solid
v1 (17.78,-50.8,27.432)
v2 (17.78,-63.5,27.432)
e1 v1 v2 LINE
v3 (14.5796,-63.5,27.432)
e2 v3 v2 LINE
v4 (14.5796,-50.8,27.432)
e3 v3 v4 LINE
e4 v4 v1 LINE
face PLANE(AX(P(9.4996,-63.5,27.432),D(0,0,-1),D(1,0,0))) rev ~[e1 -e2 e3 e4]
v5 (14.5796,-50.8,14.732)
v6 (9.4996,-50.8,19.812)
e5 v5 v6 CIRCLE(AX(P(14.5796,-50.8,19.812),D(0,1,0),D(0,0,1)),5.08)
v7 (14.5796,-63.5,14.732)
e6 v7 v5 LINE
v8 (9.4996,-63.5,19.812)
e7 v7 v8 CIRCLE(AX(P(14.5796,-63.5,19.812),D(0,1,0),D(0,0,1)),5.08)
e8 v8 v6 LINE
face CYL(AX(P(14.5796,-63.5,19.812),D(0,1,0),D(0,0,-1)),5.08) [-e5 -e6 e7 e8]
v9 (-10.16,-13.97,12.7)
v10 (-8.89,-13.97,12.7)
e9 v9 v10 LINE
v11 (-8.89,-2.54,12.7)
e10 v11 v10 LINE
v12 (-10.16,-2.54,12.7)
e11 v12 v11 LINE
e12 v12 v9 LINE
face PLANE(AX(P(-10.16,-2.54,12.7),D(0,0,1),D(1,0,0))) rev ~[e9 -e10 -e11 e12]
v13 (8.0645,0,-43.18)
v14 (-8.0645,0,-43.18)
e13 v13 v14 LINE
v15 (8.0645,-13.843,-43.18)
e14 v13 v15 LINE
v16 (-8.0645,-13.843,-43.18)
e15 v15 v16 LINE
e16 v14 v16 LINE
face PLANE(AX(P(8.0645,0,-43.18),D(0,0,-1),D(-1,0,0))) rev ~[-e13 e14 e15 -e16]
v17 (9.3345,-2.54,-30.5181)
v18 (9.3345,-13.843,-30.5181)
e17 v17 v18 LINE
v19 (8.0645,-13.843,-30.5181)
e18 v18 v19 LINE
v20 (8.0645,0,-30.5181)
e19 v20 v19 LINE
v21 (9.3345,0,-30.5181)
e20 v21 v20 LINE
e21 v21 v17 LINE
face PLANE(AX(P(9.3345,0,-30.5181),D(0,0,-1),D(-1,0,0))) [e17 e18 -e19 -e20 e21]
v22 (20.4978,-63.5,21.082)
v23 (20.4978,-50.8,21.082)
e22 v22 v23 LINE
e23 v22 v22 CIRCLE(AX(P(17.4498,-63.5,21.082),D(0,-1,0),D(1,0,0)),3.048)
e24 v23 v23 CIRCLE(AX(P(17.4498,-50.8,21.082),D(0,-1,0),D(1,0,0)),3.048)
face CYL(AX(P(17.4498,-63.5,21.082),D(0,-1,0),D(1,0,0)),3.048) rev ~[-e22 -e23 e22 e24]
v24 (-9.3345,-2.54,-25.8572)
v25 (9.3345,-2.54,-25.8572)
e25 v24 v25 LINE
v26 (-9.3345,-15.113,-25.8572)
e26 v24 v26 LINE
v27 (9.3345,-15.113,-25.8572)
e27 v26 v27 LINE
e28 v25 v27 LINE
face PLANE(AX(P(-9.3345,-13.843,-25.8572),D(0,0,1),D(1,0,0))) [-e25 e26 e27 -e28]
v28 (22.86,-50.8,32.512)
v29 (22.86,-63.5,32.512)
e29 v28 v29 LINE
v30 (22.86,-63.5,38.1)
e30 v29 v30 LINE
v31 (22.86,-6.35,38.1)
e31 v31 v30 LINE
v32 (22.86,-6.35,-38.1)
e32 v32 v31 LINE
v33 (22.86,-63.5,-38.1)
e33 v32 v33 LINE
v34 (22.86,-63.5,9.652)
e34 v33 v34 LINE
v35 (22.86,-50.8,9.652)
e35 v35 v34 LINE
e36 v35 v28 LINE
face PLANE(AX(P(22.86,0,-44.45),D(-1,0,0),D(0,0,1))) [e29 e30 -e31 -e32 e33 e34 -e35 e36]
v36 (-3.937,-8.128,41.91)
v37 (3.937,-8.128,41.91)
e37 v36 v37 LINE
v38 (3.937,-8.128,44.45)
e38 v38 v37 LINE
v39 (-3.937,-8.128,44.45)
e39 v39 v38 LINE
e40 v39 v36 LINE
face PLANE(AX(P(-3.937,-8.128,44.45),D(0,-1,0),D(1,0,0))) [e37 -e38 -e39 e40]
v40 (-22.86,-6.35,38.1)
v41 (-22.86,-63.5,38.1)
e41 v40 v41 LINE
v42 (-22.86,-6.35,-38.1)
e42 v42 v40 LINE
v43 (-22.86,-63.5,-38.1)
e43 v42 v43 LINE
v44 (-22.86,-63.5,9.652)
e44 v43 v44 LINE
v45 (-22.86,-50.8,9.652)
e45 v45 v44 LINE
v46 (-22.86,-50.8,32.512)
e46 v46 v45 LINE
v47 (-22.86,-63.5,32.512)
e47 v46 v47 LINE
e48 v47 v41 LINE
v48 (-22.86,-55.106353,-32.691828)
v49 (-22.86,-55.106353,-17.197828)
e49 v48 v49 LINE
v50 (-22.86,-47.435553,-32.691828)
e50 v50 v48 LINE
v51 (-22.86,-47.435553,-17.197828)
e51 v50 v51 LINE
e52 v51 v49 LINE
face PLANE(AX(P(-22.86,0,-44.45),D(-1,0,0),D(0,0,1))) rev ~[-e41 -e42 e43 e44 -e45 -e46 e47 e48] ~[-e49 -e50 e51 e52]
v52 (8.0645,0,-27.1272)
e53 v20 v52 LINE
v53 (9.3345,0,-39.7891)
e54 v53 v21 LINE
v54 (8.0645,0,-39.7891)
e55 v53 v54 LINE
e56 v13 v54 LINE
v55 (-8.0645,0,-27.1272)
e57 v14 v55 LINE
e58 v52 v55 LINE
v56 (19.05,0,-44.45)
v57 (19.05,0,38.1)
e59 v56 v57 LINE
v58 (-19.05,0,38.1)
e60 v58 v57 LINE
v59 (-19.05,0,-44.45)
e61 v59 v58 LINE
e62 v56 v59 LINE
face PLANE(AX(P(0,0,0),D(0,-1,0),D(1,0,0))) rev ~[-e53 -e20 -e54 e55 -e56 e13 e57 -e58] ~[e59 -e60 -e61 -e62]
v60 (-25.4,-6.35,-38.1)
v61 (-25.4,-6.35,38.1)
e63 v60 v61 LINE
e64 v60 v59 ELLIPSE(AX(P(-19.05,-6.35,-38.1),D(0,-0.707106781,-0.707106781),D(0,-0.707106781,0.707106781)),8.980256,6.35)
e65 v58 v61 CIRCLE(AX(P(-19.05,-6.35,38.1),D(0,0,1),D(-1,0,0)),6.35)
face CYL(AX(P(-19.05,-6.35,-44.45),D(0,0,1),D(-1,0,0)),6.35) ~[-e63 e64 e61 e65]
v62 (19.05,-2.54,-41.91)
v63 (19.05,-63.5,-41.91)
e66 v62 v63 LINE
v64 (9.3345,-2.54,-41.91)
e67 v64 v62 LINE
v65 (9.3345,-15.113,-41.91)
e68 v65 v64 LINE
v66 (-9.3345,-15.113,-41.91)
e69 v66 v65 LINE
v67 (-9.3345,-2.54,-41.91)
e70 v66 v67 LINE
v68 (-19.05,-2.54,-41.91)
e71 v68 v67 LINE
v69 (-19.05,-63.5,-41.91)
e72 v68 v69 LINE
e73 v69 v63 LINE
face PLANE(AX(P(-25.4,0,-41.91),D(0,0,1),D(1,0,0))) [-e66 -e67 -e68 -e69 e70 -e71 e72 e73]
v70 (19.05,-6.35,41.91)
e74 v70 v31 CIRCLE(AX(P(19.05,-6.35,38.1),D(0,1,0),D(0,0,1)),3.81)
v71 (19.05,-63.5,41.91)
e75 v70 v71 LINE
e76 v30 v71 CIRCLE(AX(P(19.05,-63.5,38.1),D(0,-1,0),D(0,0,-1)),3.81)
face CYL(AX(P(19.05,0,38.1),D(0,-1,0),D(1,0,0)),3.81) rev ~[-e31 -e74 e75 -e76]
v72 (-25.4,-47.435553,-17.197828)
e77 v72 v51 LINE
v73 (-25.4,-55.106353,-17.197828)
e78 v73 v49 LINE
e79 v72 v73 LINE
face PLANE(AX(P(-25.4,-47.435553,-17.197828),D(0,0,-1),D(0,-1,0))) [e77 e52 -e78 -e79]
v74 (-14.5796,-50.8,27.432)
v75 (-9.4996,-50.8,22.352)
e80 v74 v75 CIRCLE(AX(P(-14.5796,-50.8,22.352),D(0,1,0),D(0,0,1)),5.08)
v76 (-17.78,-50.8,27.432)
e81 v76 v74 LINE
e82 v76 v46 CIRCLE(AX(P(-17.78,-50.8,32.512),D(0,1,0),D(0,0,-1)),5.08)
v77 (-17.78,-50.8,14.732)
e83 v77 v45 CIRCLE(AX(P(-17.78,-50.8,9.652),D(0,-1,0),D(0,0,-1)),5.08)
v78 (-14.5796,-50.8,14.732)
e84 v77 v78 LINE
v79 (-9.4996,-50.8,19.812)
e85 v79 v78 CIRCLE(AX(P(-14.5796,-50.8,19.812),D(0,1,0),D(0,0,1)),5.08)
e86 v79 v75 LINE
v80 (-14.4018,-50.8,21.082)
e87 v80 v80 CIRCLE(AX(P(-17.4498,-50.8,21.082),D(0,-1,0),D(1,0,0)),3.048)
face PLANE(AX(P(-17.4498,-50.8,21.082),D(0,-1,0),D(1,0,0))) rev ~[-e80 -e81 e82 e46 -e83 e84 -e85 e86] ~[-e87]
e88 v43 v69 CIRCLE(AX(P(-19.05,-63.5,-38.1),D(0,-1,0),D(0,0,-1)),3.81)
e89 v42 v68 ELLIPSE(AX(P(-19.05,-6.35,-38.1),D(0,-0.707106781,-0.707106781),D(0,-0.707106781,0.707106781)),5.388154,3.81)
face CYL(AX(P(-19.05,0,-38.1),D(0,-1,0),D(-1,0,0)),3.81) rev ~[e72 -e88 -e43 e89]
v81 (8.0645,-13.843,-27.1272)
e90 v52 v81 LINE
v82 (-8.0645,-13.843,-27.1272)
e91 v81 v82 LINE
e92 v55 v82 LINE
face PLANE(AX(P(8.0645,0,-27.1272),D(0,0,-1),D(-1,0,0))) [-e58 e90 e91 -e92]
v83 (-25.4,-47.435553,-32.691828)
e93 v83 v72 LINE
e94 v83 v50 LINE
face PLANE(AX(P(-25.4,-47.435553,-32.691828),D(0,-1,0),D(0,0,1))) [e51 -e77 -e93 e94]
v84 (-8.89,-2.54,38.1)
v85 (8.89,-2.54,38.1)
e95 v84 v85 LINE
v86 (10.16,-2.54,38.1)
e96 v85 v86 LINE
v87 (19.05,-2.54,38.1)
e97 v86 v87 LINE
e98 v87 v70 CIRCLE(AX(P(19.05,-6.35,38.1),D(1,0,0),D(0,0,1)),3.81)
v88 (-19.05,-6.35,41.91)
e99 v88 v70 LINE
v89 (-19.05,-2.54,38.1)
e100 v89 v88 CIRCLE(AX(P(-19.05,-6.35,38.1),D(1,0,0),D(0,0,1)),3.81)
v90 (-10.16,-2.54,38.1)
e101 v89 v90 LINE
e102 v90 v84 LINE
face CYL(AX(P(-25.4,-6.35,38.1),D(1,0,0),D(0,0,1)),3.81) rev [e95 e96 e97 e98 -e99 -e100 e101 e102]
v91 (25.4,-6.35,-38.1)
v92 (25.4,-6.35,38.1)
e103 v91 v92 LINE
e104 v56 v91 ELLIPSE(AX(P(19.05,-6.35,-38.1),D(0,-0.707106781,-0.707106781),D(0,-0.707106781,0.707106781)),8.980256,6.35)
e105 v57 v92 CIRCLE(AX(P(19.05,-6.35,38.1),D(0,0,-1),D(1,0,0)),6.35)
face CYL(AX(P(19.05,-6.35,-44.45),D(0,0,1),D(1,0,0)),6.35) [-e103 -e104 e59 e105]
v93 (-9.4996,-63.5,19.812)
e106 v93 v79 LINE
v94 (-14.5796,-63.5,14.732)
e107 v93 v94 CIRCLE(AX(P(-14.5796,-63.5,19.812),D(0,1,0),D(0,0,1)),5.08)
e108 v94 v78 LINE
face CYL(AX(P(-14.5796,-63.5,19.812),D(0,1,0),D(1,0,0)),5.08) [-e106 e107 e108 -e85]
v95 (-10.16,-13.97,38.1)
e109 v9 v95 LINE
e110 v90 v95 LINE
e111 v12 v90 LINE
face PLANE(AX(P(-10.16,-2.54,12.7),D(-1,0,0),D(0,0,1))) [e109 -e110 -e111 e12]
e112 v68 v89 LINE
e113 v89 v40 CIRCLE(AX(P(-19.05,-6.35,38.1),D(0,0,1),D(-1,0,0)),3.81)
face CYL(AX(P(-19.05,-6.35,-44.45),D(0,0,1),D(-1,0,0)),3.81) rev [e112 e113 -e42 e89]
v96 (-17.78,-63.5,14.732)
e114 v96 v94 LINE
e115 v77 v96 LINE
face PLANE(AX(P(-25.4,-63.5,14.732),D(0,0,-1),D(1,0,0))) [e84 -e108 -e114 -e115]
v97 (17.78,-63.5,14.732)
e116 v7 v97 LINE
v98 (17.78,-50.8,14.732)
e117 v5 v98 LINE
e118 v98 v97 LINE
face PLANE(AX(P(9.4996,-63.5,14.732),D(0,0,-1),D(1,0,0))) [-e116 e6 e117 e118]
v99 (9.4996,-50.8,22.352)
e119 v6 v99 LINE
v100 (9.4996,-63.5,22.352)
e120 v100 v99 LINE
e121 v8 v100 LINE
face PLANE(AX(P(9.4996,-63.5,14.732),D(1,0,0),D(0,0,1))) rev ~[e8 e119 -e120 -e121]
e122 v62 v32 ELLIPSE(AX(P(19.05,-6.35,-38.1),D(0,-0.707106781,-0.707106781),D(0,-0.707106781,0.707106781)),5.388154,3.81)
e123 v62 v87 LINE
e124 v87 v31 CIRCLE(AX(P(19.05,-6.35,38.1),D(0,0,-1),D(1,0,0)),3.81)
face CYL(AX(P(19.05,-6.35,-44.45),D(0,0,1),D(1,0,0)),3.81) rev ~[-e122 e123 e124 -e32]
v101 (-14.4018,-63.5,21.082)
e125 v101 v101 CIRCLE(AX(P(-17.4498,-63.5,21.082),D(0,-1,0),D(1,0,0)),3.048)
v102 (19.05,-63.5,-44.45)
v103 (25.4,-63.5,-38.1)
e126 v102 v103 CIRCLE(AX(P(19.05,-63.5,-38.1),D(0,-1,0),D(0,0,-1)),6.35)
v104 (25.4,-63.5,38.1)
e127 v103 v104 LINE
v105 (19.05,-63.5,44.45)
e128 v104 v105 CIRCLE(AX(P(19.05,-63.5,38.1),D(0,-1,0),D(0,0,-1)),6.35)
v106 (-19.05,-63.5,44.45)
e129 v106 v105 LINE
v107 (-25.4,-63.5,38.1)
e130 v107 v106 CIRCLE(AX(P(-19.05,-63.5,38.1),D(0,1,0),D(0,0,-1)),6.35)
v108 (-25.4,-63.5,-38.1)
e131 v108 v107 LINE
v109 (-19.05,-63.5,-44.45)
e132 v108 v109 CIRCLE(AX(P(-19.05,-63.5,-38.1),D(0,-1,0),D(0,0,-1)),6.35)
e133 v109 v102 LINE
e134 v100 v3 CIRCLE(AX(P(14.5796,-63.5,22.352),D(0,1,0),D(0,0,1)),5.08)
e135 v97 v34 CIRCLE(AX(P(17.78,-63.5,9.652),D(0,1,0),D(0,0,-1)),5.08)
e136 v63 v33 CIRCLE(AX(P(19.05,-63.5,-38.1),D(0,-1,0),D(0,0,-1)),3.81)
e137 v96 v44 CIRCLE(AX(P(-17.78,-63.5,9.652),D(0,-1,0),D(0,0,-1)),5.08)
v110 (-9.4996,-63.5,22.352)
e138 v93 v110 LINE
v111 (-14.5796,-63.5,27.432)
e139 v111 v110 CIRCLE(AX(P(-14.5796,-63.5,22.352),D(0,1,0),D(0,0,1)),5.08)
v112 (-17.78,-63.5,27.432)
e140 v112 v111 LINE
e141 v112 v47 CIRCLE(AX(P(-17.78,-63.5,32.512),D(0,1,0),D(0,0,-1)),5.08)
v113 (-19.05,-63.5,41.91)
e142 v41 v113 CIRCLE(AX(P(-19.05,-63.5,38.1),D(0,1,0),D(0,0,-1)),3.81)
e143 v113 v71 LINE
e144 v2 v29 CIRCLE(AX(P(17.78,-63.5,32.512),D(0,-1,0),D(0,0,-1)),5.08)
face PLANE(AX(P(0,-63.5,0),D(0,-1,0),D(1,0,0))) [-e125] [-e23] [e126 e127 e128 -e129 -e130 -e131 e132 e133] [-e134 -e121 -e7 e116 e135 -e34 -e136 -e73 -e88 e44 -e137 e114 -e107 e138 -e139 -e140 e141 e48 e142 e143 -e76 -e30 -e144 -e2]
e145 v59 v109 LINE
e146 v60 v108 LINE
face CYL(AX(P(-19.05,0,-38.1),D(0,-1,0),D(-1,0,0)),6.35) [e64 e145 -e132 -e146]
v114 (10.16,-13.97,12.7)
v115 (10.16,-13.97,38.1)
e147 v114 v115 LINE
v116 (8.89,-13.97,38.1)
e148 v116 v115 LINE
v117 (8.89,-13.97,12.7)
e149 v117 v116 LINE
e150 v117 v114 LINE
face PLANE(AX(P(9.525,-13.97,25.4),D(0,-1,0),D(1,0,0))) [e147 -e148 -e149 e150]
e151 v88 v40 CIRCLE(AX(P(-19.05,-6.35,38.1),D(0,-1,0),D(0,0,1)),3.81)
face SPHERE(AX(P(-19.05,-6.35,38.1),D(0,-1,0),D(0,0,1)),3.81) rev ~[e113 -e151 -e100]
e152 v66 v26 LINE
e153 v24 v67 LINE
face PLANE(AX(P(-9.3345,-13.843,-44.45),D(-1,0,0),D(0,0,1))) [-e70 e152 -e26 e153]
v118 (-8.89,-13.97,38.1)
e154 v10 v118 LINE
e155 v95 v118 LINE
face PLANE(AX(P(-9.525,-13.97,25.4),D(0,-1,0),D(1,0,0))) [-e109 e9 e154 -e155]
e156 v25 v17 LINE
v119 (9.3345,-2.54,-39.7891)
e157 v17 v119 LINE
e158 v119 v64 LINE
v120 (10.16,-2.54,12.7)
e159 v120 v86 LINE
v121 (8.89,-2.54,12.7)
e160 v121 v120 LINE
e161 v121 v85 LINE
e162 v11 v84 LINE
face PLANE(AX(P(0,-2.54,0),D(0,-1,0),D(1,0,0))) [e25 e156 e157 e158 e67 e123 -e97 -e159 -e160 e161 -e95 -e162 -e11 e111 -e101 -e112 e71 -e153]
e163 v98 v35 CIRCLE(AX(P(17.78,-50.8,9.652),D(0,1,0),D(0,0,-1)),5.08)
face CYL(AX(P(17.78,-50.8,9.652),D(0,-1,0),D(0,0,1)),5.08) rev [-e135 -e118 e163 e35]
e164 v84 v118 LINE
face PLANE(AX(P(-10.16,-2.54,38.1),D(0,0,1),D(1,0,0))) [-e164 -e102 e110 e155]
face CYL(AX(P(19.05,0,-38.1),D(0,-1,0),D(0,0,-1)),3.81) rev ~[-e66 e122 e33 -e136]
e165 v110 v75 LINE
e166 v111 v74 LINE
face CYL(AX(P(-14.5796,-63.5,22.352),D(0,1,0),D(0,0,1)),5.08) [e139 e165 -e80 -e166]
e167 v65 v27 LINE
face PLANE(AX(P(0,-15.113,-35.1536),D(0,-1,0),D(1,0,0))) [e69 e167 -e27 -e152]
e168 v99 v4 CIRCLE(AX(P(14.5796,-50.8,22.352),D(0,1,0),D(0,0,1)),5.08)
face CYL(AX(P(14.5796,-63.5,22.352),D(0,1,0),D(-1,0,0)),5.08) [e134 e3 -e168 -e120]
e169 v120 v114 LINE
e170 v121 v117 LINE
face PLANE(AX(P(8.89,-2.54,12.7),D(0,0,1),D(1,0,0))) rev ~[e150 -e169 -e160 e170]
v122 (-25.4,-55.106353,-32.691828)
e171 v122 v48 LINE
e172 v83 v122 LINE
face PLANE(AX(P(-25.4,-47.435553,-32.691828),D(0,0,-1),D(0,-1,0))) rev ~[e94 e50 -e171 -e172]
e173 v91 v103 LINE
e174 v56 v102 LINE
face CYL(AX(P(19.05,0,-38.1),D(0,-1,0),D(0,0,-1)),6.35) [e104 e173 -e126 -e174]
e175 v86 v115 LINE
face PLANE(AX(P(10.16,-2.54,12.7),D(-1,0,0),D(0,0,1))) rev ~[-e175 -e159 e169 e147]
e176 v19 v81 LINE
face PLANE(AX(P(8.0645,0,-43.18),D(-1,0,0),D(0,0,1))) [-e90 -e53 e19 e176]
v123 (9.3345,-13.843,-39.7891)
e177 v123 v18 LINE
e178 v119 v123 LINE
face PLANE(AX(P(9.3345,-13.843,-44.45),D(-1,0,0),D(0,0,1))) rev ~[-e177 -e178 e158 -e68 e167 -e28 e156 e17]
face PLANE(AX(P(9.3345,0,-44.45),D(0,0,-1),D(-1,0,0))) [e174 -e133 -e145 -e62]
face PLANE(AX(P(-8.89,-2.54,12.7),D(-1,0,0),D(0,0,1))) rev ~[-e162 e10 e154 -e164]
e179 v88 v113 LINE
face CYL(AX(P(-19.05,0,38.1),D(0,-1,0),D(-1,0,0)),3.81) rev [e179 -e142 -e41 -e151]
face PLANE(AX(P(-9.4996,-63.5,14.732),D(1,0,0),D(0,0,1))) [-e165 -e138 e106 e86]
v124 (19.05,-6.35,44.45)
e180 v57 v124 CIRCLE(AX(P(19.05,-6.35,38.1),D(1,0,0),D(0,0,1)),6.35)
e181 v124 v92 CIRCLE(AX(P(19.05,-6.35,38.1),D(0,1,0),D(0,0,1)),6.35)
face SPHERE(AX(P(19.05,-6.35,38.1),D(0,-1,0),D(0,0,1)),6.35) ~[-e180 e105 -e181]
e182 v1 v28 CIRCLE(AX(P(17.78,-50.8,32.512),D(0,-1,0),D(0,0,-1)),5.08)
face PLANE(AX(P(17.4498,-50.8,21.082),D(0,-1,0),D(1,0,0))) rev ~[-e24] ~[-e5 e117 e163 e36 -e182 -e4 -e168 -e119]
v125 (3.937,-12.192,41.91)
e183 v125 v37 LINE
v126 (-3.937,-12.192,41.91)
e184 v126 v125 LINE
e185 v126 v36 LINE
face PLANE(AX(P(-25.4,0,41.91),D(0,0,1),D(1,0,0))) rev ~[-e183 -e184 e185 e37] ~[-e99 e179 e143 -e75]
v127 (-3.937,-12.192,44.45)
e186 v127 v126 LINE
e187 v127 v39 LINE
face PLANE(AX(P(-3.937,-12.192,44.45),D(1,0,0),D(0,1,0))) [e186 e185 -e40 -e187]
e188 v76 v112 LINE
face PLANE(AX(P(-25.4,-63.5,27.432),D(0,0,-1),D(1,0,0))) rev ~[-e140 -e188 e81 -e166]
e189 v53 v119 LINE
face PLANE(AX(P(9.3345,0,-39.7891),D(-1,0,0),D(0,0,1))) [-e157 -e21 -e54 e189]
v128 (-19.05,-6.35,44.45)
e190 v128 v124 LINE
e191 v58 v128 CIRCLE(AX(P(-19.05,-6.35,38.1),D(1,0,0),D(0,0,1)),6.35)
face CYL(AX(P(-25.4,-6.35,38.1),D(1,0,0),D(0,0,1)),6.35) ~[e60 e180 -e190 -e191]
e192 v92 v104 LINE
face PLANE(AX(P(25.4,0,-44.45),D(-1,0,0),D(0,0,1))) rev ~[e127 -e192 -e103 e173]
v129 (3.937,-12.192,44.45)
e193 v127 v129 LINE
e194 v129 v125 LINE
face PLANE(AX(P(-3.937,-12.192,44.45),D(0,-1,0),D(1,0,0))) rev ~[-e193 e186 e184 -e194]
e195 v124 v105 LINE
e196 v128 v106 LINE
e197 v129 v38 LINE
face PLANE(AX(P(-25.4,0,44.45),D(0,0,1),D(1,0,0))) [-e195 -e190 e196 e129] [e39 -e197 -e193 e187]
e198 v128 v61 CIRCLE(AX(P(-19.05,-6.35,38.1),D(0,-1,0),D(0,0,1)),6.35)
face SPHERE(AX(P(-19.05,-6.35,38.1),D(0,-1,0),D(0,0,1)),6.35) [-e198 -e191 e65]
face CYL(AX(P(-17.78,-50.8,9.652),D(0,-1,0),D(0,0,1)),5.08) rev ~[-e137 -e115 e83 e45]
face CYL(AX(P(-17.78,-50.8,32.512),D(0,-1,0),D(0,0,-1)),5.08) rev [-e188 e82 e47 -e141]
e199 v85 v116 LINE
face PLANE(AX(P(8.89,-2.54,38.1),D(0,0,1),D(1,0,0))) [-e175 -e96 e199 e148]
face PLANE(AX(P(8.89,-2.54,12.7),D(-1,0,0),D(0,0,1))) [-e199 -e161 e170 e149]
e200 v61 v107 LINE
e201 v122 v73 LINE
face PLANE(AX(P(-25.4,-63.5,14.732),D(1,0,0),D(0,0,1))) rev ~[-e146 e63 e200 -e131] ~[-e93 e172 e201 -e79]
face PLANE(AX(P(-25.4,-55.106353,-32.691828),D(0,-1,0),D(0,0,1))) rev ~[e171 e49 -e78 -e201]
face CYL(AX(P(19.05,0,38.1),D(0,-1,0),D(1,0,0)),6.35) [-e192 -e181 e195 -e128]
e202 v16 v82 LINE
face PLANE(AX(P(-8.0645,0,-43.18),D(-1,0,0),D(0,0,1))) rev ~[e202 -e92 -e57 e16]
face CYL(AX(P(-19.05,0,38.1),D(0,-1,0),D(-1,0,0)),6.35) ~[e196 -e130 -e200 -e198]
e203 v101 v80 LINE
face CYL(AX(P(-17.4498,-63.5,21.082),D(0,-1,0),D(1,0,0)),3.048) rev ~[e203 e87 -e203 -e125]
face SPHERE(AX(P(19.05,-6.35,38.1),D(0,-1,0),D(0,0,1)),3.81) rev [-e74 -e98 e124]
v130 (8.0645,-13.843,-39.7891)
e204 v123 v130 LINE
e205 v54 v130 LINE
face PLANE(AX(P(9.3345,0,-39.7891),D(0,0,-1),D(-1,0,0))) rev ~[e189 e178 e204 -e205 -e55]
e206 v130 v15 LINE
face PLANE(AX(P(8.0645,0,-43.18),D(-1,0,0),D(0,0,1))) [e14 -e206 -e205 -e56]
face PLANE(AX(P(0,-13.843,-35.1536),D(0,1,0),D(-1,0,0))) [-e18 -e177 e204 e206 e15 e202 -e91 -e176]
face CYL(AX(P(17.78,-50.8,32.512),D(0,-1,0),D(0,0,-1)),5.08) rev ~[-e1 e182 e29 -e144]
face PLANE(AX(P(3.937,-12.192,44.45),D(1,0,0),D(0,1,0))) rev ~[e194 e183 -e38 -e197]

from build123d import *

# Parameters (mm, degrees)
F0_W      = 50.8
F0_H      = 88.9
F1_DEPTH  = 63.5
F2_R      = 6.35
F3_T      = -2.54
F4_W      = 15.9004
F4_H      = 12.7
F4_R      = 3.048
F5_DEPTH  = 12.7
F6_R      = 5.08
F7_W      = 7.874
F7_H      = 4.064
F8_DEPTH  = 25.4
F9_W      = 1.27
F9_H      = 25.4
F10_DEPTH = 11.43
F11_W     = 16.129
F11_H     = 16.0528
F12_DEPTH = 13.843
F11_W_2   = 18.669
F11_H_2   = 18.5928
F13_DEPTH = 13.843
F14_W     = 3.7612880599
F14_H     = 9.271
F15_DEPTH = 13.843
F16_W     = 18.669
F16_H     = 18.5928
F17_DEPTH = 1.27
F18_W     = 7.6708
F18_H     = 15.494
F19_DEPTH = 25.4


with BuildPart() as f1:
    # F0 (on Front) → F1 (new body)
    with BuildSketch(Plane.XZ):
        Rectangle(F0_W, F0_H)
    extrude(amount=F1_DEPTH)

    # F2
    f2_edges = [f1.edges().sort_by_distance(p)[0] for p in [
        (25.4, -31.75, 44.45),
        (-25.4, -31.75, 44.45),
        (0, 0, 44.45),
        (25.4, -31.75, -44.45),
        (-25.4, -31.75, -44.45),
        (25.4, 0, 0),
        (-25.4, 0, 0),
    ]]
    fillet(f2_edges, radius=F2_R)

    # F3
    f3_openings = [f1.faces().sort_by_distance(p)[0] for p in [
        (0, -63.5, 0),
    ]]
    offset(amount=F3_T, openings=f3_openings)

    # F4 (on face) → F5 (join)
    with BuildSketch(Plane.XZ.offset(63.5)):
        with Locations((-17.4498, 21.082)):
            Rectangle(F4_W, F4_H)
        with Locations((-17.4498, 21.082)):
            Circle(F4_R, mode=Mode.SUBTRACT)
        with Locations((17.4498, 21.082)):
            Rectangle(F4_W, F4_H)
        with Locations((17.4498, 21.082)):
            Circle(F4_R, mode=Mode.SUBTRACT)
    extrude(amount=-F5_DEPTH)

    # F6
    f6_edges = [f1.edges().sort_by_distance(p)[0] for p in [
        (-9.4996, -57.15, 27.432),
        (-9.4996, -57.15, 14.732),
        (9.4996, -57.15, 14.732),
        (9.4996, -57.15, 27.432),
        (-22.86, -57.15, 27.432),
        (22.86, -57.15, 27.432),
        (-22.86, -57.15, 14.732),
        (22.86, -57.15, 14.732),
    ]]
    fillet(f6_edges, radius=F6_R)

    # F7 (on face) → F8 (cut)
    with BuildSketch(Plane.XY.offset(44.45)):
        with Locations((0, -10.16)):
            Rectangle(F7_W, F7_H)
    extrude(amount=-F8_DEPTH, mode=Mode.SUBTRACT)

    # F9 (on face) → F10 (join)
    with BuildSketch(Plane.XZ.offset(2.54)):
        with Locations((-9.525, 25.4)):
            Rectangle(F9_W, F9_H)
        with Locations((9.525, 25.4)):
            Rectangle(F9_W, F9_H)
    extrude(amount=F10_DEPTH)

    # F11 (on face) → F12 (cut)
    with BuildSketch(Plane(origin=(0, 0, 0), x_dir=(-1, 0, 0), z_dir=(0, 1, 0))):
        with Locations((0, -35.1536)):
            Rectangle(F11_W, F11_H)
    extrude(amount=-F12_DEPTH, mode=Mode.SUBTRACT)

    # F11 (on face) → F13 (join)
    with BuildSketch(Plane(origin=(0, 0, 0), x_dir=(-1, 0, 0), z_dir=(0, 1, 0))):
        with Locations((0, -35.1536)):
            Rectangle(F11_W_2, F11_H_2)
        with Locations((0, -35.1536)):
            Rectangle(F11_W, F11_H, mode=Mode.SUBTRACT)
    extrude(amount=-F13_DEPTH)

    # F14 (on face) → F15 (cut)
    with BuildSketch(Plane(origin=(0, 0, 0), x_dir=(-1, 0, 0), z_dir=(0, 1, 0))):
        with Locations((-7.45385597, -35.1536)):
            Rectangle(F14_W, F14_H)
    extrude(amount=-F15_DEPTH, mode=Mode.SUBTRACT)

    # F16 (on face) → F17 (join)
    with BuildSketch(Plane.XZ.offset(13.843)):
        with Locations((0, -35.1536)):
            Rectangle(F16_W, F16_H)
    extrude(amount=F17_DEPTH)

    # F18 (on face) → F19 (cut)
    with BuildSketch(Plane(origin=(-25.4, 0, 0), x_dir=(0, -1, 0), z_dir=(-1, 0, 0))):
        with Locations((51.2709531141, -24.9448278919)):
            Rectangle(F18_W, F18_H)
    extrude(amount=-F19_DEPTH, mode=Mode.SUBTRACT)


solid = f1.part
